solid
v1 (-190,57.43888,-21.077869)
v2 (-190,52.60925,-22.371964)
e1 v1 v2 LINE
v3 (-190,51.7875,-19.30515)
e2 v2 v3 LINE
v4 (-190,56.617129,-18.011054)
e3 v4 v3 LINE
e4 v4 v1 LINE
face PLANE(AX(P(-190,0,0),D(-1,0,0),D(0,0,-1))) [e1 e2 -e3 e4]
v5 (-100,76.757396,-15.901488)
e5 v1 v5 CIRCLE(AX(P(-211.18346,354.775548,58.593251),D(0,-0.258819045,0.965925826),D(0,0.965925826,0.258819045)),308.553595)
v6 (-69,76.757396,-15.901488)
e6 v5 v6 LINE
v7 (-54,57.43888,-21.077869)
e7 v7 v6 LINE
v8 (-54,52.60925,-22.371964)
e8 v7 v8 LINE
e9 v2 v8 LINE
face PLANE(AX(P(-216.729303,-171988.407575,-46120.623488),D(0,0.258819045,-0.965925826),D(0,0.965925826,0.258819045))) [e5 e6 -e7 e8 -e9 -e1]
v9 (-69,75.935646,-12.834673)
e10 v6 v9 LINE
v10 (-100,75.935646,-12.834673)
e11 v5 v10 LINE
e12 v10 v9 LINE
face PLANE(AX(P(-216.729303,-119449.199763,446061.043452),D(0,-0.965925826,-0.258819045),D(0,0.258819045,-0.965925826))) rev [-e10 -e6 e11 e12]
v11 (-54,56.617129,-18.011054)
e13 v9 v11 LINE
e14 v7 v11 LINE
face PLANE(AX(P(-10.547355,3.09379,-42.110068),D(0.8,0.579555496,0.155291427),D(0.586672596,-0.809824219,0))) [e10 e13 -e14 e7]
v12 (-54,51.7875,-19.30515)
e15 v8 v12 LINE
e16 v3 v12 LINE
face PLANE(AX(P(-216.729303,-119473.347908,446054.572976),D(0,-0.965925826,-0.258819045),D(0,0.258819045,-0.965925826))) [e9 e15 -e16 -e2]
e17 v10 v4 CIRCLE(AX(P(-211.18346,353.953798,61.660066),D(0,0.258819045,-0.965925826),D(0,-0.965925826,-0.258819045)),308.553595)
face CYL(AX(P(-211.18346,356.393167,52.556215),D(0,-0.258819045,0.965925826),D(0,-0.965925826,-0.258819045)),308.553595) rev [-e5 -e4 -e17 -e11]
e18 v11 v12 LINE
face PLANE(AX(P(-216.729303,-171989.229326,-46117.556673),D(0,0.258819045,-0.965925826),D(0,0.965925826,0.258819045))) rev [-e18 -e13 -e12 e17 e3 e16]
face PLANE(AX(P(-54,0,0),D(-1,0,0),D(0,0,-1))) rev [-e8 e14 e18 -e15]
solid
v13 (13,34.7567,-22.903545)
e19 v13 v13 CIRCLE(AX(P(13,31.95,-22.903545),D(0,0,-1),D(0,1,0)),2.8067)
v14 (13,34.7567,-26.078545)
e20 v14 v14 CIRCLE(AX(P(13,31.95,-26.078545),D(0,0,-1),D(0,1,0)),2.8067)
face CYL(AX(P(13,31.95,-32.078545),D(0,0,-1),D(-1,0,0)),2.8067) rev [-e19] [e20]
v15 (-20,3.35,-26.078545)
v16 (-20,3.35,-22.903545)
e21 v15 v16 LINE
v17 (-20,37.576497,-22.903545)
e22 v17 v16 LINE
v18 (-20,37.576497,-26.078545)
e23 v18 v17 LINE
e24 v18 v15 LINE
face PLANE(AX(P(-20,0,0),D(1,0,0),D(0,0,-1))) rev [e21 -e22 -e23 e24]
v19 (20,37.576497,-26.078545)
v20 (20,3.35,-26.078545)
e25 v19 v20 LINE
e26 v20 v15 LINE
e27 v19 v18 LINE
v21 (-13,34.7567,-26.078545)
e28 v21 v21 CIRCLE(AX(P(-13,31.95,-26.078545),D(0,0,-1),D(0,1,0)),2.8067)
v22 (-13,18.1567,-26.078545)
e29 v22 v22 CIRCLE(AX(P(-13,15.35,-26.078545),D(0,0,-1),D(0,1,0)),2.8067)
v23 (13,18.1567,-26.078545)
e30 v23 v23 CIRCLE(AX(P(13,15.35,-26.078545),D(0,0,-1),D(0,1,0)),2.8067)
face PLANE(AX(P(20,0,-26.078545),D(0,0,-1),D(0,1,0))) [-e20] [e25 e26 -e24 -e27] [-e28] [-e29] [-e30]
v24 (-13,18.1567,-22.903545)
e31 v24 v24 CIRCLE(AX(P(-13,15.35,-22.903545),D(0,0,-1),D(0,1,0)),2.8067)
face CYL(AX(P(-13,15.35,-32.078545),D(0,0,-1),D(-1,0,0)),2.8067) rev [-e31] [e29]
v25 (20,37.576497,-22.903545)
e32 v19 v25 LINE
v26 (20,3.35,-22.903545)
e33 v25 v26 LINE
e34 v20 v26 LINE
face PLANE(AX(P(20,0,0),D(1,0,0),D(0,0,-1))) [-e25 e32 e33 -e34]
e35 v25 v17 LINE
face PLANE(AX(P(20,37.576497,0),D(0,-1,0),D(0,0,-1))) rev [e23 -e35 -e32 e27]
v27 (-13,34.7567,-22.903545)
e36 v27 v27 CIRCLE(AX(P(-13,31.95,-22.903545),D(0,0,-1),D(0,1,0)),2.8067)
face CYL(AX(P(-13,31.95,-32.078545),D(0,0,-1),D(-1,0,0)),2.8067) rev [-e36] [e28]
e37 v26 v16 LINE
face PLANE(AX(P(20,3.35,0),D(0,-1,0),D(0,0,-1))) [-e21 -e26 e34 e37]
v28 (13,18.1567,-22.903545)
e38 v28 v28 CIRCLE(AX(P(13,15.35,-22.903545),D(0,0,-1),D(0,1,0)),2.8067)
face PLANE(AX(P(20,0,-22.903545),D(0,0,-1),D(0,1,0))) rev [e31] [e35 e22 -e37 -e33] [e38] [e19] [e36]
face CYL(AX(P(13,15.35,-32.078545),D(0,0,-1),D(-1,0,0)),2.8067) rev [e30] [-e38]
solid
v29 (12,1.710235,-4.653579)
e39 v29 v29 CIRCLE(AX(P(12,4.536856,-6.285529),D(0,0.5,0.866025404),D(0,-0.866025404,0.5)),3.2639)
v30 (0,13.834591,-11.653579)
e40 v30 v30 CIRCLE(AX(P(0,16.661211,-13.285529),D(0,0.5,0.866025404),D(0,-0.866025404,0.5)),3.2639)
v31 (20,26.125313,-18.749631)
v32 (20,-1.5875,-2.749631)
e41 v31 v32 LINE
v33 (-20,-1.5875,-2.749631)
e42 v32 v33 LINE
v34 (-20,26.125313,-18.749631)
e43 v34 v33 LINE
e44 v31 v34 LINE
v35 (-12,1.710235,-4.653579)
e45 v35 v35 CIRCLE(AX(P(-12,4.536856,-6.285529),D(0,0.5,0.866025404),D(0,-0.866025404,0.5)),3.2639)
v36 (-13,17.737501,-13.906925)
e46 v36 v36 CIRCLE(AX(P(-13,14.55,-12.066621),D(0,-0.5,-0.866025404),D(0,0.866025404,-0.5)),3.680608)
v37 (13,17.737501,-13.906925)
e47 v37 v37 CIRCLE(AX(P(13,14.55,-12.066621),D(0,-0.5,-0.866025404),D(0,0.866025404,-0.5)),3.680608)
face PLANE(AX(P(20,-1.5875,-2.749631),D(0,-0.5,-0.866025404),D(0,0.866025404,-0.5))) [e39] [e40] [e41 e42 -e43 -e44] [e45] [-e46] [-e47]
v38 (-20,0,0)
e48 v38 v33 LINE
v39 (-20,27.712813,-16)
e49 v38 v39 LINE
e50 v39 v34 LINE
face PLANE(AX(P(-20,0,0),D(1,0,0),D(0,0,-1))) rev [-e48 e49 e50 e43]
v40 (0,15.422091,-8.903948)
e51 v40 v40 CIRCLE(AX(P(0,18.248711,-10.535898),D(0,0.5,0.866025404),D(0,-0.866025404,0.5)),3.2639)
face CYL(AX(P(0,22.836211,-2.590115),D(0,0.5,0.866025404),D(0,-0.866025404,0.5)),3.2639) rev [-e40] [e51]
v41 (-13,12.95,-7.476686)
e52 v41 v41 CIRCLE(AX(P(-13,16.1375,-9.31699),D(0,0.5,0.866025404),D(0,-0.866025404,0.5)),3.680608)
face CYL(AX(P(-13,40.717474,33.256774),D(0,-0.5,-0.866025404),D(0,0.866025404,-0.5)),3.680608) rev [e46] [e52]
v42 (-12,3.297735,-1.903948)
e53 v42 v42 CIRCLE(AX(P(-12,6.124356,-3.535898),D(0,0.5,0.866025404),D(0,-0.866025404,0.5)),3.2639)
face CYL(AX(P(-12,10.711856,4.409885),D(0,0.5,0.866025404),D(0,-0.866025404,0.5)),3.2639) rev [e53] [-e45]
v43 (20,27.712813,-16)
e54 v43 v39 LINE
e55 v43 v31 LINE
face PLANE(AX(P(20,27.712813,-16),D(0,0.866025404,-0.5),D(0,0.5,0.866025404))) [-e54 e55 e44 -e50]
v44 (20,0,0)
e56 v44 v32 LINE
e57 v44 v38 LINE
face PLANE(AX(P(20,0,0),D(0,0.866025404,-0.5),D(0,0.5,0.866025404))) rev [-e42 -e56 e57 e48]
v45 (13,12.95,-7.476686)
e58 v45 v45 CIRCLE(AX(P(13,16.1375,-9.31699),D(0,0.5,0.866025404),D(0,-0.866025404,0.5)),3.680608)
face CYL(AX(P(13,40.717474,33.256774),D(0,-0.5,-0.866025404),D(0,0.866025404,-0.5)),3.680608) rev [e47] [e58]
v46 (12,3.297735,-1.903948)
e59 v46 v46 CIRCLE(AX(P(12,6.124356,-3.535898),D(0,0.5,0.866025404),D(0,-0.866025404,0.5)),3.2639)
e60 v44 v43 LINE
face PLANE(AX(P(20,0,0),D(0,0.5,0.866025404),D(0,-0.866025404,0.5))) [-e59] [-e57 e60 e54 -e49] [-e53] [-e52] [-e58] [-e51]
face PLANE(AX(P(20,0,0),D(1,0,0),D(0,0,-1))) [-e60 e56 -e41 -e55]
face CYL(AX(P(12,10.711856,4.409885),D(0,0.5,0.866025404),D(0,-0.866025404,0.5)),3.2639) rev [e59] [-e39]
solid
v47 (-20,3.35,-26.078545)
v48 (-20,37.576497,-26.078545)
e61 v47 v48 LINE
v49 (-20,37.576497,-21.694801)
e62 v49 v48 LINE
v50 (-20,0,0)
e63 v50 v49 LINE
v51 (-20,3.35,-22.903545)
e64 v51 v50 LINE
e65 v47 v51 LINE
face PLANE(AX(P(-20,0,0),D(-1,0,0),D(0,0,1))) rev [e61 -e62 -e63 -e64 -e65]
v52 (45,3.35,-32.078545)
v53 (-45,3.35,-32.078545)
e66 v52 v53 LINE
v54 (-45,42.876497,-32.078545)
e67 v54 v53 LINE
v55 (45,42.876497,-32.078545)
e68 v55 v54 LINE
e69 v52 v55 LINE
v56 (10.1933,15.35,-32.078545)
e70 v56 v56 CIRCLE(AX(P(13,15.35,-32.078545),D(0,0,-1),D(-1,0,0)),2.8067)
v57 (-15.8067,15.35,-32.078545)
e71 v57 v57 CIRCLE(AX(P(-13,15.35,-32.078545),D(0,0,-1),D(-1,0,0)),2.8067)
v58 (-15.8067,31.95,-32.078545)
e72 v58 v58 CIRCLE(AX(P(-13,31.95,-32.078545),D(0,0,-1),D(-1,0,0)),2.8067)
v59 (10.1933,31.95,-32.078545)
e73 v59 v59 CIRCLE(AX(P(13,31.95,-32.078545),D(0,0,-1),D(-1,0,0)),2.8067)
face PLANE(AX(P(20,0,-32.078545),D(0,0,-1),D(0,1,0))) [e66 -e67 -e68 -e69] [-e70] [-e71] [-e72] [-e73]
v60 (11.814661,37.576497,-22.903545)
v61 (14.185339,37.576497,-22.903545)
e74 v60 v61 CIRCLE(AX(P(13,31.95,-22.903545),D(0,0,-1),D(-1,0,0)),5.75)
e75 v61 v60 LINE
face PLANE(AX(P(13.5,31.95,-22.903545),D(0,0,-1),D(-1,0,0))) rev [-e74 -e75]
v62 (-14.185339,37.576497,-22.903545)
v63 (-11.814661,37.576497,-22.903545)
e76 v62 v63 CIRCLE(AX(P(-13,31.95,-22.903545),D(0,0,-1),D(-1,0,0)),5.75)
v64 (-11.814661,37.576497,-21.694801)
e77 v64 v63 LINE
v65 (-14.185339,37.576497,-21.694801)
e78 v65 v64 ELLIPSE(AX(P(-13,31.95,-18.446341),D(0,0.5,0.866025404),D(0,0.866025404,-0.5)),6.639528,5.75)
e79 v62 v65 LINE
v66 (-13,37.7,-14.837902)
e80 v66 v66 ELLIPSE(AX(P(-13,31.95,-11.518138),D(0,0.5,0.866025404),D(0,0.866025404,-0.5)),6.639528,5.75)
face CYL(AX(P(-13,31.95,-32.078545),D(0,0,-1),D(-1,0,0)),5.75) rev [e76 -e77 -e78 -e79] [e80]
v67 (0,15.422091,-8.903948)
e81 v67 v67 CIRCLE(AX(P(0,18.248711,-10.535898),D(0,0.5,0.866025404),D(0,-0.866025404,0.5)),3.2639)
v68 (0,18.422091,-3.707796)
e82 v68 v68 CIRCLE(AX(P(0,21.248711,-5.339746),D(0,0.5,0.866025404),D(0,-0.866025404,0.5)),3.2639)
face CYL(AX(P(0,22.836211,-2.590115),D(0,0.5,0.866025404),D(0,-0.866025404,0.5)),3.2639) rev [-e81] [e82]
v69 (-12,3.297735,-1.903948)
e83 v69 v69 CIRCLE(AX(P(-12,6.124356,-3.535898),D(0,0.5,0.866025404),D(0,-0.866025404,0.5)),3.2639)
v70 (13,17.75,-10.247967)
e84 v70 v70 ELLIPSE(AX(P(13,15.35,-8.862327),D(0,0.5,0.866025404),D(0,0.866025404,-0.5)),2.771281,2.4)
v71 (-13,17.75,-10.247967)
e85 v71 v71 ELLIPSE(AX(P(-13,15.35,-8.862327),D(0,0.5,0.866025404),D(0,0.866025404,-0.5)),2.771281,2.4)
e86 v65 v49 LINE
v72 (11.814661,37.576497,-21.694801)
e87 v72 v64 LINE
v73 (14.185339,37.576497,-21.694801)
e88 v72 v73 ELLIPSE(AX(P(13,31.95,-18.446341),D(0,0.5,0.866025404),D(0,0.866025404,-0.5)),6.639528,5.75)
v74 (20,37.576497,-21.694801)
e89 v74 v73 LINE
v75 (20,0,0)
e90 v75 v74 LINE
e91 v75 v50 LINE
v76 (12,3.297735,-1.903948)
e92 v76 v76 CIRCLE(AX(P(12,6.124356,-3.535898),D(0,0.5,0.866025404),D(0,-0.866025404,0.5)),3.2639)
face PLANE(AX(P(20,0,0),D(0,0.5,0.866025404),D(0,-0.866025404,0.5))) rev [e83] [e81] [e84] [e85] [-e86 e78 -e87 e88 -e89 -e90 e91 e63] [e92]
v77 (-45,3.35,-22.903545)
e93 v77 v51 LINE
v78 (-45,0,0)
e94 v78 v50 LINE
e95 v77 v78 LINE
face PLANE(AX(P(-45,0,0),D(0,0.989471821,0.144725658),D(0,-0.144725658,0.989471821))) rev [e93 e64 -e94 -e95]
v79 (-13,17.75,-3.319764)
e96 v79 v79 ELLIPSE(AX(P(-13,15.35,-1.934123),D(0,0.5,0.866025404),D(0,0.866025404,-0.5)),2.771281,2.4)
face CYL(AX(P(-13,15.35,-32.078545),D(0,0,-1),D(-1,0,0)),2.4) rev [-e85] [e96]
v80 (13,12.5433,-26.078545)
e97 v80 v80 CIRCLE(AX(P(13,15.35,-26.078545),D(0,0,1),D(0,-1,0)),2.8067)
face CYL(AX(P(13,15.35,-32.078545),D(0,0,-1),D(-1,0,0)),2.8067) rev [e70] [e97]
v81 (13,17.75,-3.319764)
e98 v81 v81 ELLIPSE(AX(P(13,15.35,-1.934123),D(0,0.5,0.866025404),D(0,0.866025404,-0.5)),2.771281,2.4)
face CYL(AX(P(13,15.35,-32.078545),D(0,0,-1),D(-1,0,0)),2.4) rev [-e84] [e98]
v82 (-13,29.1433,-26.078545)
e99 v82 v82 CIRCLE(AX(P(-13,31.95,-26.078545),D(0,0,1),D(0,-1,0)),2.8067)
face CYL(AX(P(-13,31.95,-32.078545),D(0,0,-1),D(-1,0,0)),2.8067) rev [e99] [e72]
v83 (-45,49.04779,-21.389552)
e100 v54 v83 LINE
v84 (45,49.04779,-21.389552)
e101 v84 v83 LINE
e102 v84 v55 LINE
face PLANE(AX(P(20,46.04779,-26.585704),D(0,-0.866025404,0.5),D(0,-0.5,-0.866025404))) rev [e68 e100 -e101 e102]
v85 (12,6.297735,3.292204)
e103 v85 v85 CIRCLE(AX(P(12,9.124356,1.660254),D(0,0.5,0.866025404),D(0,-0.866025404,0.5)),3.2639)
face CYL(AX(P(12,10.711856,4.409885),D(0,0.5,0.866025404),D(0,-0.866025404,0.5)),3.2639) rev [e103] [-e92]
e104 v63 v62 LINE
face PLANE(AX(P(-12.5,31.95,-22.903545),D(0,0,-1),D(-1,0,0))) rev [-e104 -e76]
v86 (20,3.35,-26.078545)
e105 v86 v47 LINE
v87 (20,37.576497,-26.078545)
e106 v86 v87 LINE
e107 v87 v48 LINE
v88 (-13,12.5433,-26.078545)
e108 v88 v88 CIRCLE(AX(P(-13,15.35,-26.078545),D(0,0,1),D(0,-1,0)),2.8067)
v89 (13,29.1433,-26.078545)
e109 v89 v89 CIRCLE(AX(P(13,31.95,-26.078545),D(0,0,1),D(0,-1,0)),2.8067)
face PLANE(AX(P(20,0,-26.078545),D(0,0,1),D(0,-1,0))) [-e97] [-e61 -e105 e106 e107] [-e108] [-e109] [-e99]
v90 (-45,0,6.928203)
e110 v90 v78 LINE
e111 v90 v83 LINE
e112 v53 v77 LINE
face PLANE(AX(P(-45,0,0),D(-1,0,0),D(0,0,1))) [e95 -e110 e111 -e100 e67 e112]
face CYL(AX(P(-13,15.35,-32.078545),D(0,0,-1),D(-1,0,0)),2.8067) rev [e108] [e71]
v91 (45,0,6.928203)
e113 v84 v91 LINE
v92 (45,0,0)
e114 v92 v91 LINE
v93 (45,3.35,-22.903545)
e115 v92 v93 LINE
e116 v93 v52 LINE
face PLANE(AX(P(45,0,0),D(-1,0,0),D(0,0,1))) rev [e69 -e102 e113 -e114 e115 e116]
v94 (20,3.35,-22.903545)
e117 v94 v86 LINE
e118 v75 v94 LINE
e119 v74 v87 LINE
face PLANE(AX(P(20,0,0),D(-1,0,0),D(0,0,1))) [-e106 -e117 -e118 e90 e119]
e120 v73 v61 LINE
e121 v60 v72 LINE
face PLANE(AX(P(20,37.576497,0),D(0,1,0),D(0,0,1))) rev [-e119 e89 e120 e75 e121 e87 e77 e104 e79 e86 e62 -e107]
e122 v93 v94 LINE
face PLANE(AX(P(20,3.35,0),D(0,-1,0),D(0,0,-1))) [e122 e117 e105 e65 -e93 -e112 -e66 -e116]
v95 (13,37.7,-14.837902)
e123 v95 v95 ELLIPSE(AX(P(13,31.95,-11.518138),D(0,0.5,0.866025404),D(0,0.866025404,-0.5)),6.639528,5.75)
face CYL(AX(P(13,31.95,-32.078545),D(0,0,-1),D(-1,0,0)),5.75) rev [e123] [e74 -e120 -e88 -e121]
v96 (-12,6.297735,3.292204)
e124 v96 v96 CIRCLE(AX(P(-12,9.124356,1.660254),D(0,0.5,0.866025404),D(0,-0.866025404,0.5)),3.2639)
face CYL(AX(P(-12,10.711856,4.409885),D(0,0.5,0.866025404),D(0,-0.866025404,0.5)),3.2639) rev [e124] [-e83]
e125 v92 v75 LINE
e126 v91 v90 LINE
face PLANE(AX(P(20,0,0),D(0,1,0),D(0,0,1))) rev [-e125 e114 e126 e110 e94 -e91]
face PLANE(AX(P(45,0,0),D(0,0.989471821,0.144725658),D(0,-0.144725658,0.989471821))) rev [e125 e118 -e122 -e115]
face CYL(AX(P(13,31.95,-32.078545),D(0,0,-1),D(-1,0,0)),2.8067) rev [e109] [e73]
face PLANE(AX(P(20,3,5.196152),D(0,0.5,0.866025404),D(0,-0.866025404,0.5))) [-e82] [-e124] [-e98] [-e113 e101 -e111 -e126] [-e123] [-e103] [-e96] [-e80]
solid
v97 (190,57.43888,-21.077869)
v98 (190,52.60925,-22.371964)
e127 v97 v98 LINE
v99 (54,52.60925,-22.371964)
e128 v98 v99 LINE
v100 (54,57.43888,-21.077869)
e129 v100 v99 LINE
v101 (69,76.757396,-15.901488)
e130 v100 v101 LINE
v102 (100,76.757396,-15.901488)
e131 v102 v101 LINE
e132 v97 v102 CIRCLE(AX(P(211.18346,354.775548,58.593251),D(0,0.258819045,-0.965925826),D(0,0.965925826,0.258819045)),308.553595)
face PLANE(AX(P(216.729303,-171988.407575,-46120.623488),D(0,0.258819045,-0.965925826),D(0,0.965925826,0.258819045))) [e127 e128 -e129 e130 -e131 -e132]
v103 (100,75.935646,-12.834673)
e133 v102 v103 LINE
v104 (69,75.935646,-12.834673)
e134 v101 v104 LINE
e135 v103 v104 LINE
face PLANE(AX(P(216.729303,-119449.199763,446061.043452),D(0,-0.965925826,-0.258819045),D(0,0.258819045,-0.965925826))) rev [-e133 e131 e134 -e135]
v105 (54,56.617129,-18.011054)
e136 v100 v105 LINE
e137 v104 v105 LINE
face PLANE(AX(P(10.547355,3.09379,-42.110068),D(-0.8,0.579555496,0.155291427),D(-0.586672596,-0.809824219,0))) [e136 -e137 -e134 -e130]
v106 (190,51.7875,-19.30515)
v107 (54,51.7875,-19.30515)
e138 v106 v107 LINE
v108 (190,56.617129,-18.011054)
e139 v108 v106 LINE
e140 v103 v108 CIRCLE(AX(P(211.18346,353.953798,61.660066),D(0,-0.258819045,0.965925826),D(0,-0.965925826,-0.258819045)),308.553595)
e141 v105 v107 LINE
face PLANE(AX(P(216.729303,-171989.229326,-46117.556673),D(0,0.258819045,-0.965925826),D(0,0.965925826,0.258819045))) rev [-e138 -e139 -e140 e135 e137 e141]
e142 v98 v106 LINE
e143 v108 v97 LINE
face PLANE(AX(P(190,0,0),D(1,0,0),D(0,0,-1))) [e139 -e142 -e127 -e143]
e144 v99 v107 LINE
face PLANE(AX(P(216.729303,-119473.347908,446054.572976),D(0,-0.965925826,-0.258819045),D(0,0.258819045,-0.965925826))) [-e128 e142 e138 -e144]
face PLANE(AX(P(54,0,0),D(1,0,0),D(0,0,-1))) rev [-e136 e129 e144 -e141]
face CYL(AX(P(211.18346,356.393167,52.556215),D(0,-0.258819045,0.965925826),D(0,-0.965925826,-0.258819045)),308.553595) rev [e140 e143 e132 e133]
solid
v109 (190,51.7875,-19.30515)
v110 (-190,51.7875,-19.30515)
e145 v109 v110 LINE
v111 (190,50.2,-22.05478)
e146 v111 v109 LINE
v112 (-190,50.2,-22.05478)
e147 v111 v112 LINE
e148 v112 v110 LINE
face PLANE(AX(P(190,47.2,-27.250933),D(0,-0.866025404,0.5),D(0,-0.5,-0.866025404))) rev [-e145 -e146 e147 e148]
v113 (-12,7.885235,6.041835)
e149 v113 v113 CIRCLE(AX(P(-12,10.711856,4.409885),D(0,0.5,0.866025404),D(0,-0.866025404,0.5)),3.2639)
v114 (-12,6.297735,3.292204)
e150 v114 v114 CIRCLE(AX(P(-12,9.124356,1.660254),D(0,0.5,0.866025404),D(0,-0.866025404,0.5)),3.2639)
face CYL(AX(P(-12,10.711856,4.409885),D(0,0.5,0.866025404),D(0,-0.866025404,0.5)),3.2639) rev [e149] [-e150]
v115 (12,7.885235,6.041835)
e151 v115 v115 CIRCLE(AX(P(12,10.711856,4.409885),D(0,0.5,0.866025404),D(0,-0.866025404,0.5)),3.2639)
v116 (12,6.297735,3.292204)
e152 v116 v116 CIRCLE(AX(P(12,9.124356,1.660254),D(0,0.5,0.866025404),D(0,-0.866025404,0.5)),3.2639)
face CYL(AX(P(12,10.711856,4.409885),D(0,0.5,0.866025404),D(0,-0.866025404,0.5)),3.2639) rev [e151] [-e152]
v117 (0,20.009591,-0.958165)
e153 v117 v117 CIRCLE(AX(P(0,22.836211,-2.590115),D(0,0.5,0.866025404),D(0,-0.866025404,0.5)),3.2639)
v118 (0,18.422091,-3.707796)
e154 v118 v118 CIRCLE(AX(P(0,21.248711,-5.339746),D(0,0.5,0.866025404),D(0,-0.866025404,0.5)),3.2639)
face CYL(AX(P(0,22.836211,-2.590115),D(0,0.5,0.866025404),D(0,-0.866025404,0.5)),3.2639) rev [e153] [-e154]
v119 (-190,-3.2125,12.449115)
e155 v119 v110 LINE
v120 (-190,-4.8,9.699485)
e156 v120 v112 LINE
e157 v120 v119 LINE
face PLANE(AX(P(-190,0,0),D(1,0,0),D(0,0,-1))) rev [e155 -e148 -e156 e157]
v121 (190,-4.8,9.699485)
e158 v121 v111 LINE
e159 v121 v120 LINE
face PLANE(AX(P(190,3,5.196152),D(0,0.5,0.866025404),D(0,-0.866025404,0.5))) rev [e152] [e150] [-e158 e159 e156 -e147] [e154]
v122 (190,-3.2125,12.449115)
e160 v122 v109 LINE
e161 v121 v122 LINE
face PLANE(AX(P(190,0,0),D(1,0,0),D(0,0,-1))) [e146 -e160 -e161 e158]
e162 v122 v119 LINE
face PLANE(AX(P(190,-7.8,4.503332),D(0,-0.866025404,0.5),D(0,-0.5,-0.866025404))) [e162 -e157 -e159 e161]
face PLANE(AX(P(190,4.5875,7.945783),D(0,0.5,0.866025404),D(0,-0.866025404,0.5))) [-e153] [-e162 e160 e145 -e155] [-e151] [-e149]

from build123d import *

# Parameters (mm, degrees)
BOSS_EXTRUDE1_DEPTH                 = 190
BOSS_EXTRUDE2_START                 = 54
BOSS_EXTRUDE2_DEPTH                 = 136
CUT_EXTRUDE1_DEPTH                  = 207.570315507
BOSS_EXTRUDE4_DEPTH                 = 20
BOSS_EXTRUDE5_DEPTH                 = 20
BOSS_EXTRUDE6_DEPTH                 = 20
F_12_CLEARANCE_HOLE1_AT_2_COUNT     = 2
F_12_CLEARANCE_HOLE1_AT_2_PITCH     = 16.6
F_12_CLEARANCE_HOLE1_AT_3_COUNT     = 2
F_12_CLEARANCE_HOLE1_AT_3_PITCH     = 30.847366176
F_12_CLEARANCE_HOLE1_AT_4_COUNT     = 2
F_12_CLEARANCE_HOLE1_AT_4_PITCH     = 26
SKETCH15_W                          = 2.4
SKETCH15_H                          = 44.527659988
F_4_8_4_8_DIAMETER_HOLE1_AT_2_COUNT = 2
F_4_8_4_8_DIAMETER_HOLE1_AT_2_PITCH = 26
ADVANCEDHOLE6_START                 = -22.903544809
ADVANCEDHOLE6_OUTLINE_R             = 5.75
ADVANCEDHOLE6_DEPTH                 = 14.705171087
SKETCH16_R                          = 3.68060844
CUT_EXTRUDE2_DEPTH                  = 208.600838038
ADVANCEDHOLE2_START                 = -3.175
ADVANCEDHOLE2_OUTLINE_R             = 3.2639
ADVANCEDHOLE2_DEPTH                 = 12.35
BOSS_EXTRUDE7_START                 = 20
BOSS_EXTRUDE7_DEPTH                 = 25
BOSS_EXTRUDE8_START                 = -20
BOSS_EXTRUDE8_DEPTH                 = 25


# Read off the part's stored shape, not the designer's step: AdvancedHole6, AdvancedHole2
with BuildPart() as part:
    # Sketch1 → Boss-Extrude1 (new, symmetric)
    with BuildSketch(Plane(origin=(0, 0, 0), x_dir=(0, 0, -1), z_dir=(1, 0, 0))):
        Polygon((-9.699484522, -4.8), (22.054780283, 50.2), (19.305149626, 51.7875), (-12.449115179, -3.2125), align=None)
    extrude(amount=BOSS_EXTRUDE1_DEPTH, both=True)


with BuildPart() as body_2:
    # Sketch1<4> → Boss-Extrude2 (new body)
    with BuildSketch(Plane(origin=(0, 0, 0), x_dir=(0, 0, -1), z_dir=(1, 0, 0)).offset(BOSS_EXTRUDE2_START)):
        Polygon((19.305149626, 51.7875), (22.371964124, 52.609250468), (15.901487997, 76.757396125), (12.834673498, 75.935645657), align=None)
    extrude(amount=BOSS_EXTRUDE2_DEPTH)

    # Sketch2 → Cut-Extrude1 (cut, through all)
    with BuildSketch(Plane(origin=(0, 8.295392107, -30.958824813), x_dir=(1, 0, 0), z_dir=(0, -0.25881904510252507, 0.9659258262890673))):
        Polygon((54, 50.026343337), (69, 70.026343337), (54, 70.026343337), align=None)
        with BuildLine():
            ThreePointArc((100, 70.026343337), (144.24878754, 56.645887268), (190, 50.026343337))
            Line((190, 50.026343337), (190, 70.026343337))
            Line((190, 70.026343337), (100, 70.026343337))
        make_face()
    extrude(amount=-CUT_EXTRUDE1_DEPTH, mode=Mode.SUBTRACT)


with BuildPart() as body_3:
    # Mirror1: mirrored copy
    add(body_2.part.mirror(Plane(origin=(0, 0, 0), x_dir=(0, 0, 1), z_dir=(1, 0, 0))))


with BuildPart() as body_4:
    # Sketch1<5> → Boss-Extrude4 (new, symmetric)
    with BuildSketch(Plane(origin=(0, 0, 0), x_dir=(0, 0, -1), z_dir=(1, 0, 0))):
        Polygon((21.389551727, 49.047790342), (-6.92820323, 0), (0, 0), (16, 27.712812921), (21.694800836, 37.576497308), (22.903544809, 37.576497308), (26.078544809, 37.576497308), (26.078544809, 12.35), (26.078544809, 3.35), (32.078544809, 3.35), (32.078544809, 42.876497308), align=None)
    extrude(amount=BOSS_EXTRUDE4_DEPTH, both=True)


with BuildPart() as body_5:
    # Sketch1<6> → Boss-Extrude5 (new, symmetric)
    with BuildSketch(Plane(origin=(0, 0, 0), x_dir=(0, 0, -1), z_dir=(1, 0, 0))):
        Polygon((2.749630657, -1.5875), (18.749630657, 26.125312921), (16, 27.712812921), (0, 0), align=None)
    extrude(amount=BOSS_EXTRUDE5_DEPTH, both=True)

    # Sketch16 → Cut-Extrude2 (cut, through all)
    with BuildSketch(Plane(origin=(0, -1.5875, -2.749630657), x_dir=(-1, 0, 0), z_dir=(0, -0.49999999999999756, -0.86602540378444))):
        with Locations(Location((13, 18.633980412, 0), (0, 0, 90))):
            Circle(SKETCH16_R)
        with Locations(Location((-13, 18.633980412, 0), (0, 0, 90))):
            Circle(SKETCH16_R)
    extrude(amount=-CUT_EXTRUDE2_DEPTH, mode=Mode.SUBTRACT)


with BuildPart() as body_6:
    # Sketch1<7> → Boss-Extrude6 (new, symmetric)
    with BuildSketch(Plane(origin=(0, 0, 0), x_dir=(0, 0, -1), z_dir=(1, 0, 0))):
        Polygon((22.903544809, 37.576497308), (22.903544809, 3.35), (26.078544809, 3.35), (26.078544809, 12.35), (26.078544809, 37.576497308), align=None)
    extrude(amount=BOSS_EXTRUDE6_DEPTH, both=True)


with BuildPart() as f_12_clearance_hole1_tool:
    # Sketch8 → #12 Clearance Hole1 (revolve)
    with BuildSketch(Plane(origin=(13, 15.35, -32.078544809), x_dir=(0, 1, 0), z_dir=(1, 0, 0))):
        Polygon((0, 0), (0, 11.686435499), (2.8067, 10), (2.8067, 0), align=None)
    f_12_clearance_hole1 = revolve(axis=Axis((13, 15.35, -38.428544809), (0, 0, 1)))


with BuildPart() as body_4_1:
    add(body_4.part)

    # #12 Clearance Hole1: cut by f_12_clearance_hole1_tool
    add(f_12_clearance_hole1_tool.part, mode=Mode.SUBTRACT)


with BuildPart() as body_6_1:
    add(body_6.part)

    # #12 Clearance Hole1: cut by f_12_clearance_hole1_tool
    add(f_12_clearance_hole1_tool.part, mode=Mode.SUBTRACT)


with BuildPart() as f_12_clearance_hole1_at_2_tool:
    # #12 Clearance Hole1 at 2: #12 Clearance Hole1 ×2
    with Locations(*[(0, i * F_12_CLEARANCE_HOLE1_AT_2_PITCH, 0) for i in range(1, F_12_CLEARANCE_HOLE1_AT_2_COUNT)]):
        add(f_12_clearance_hole1)


with BuildPart() as body_4_2:
    add(body_4_1.part)

    # #12 Clearance Hole1 at 2: cut by f_12_clearance_hole1_at_2_tool
    add(f_12_clearance_hole1_at_2_tool.part, mode=Mode.SUBTRACT)


with BuildPart() as body_6_2:
    add(body_6_1.part)

    # #12 Clearance Hole1 at 2: cut by f_12_clearance_hole1_at_2_tool
    add(f_12_clearance_hole1_at_2_tool.part, mode=Mode.SUBTRACT)


with BuildPart() as f_12_clearance_hole1_at_3_tool:
    # #12 Clearance Hole1 at 3: #12 Clearance Hole1 ×2
    with Locations(*[Vector(-0.842859641617543, 0.5381334634942776, 0) * (i * F_12_CLEARANCE_HOLE1_AT_3_PITCH) for i in range(1, F_12_CLEARANCE_HOLE1_AT_3_COUNT)]):
        add(f_12_clearance_hole1)


with BuildPart() as body_4_3:
    add(body_4_2.part)

    # #12 Clearance Hole1 at 3: cut by f_12_clearance_hole1_at_3_tool
    add(f_12_clearance_hole1_at_3_tool.part, mode=Mode.SUBTRACT)


with BuildPart() as body_6_3:
    add(body_6_2.part)

    # #12 Clearance Hole1 at 3: cut by f_12_clearance_hole1_at_3_tool
    add(f_12_clearance_hole1_at_3_tool.part, mode=Mode.SUBTRACT)


with BuildPart() as f_12_clearance_hole1_at_4_tool:
    # #12 Clearance Hole1 at 4: #12 Clearance Hole1 ×2
    with Locations(*[(-i * F_12_CLEARANCE_HOLE1_AT_4_PITCH, 0, 0) for i in range(1, F_12_CLEARANCE_HOLE1_AT_4_COUNT)]):
        add(f_12_clearance_hole1)


with BuildPart() as body_4_4:
    add(body_4_3.part)

    # #12 Clearance Hole1 at 4: cut by f_12_clearance_hole1_at_4_tool
    add(f_12_clearance_hole1_at_4_tool.part, mode=Mode.SUBTRACT)

    # Sketch15 → Ø4.8 (4.8) Diameter Hole1 (revolve, cut)
    with BuildSketch(Plane(origin=(-13, 15.35, -32.078544809), x_dir=(0, 1, 0), z_dir=(1, 0, 0))):
        with Locations((1.2, 22.263829994)):
            Rectangle(SKETCH15_W, SKETCH15_H)
    f_4_8_4_8_diameter_hole1 = revolve(axis=Axis((-13, 15.35, -38.428544809), (0, 0, 1)), mode=Mode.SUBTRACT)

    # Ø4.8 (4.8) Diameter Hole1 at 2: Ø4.8 (4.8) Diameter Hole1 ×2
    with Locations(*[(i * F_4_8_4_8_DIAMETER_HOLE1_AT_2_PITCH, 0, 0) for i in range(1, F_4_8_4_8_DIAMETER_HOLE1_AT_2_COUNT)]):
        add(f_4_8_4_8_diameter_hole1, mode=Mode.SUBTRACT)

    # AdvancedHole6 outline → AdvancedHole6 (cut)
    with BuildSketch(Plane.XY.offset(ADVANCEDHOLE6_START)):
        with Locations((-13, 31.95)):
            Circle(ADVANCEDHOLE6_OUTLINE_R)
        with Locations((13, 31.95)):
            Circle(ADVANCEDHOLE6_OUTLINE_R)
    extrude(amount=ADVANCEDHOLE6_DEPTH, mode=Mode.SUBTRACT)


with BuildPart() as body_6_4:
    add(body_6_3.part)

    # #12 Clearance Hole1 at 4: cut by f_12_clearance_hole1_at_4_tool
    add(f_12_clearance_hole1_at_4_tool.part, mode=Mode.SUBTRACT)


with BuildPart() as advancedhole2_tool:
    # AdvancedHole2 outline → AdvancedHole2 (new body)
    with BuildSketch(Plane(origin=(0, 0, 0), x_dir=(1, 0, 0), z_dir=(0, 0.49999999999999795, 0.8660254037844399)).offset(ADVANCEDHOLE2_START)):
        with Locations((0, 21.07179677)):
            Circle(ADVANCEDHOLE2_OUTLINE_R)
        with Locations((-12, 7.07179677)):
            Circle(ADVANCEDHOLE2_OUTLINE_R)
        with Locations((12, 7.07179677)):
            Circle(ADVANCEDHOLE2_OUTLINE_R)
    extrude(amount=ADVANCEDHOLE2_DEPTH)


with BuildPart() as part_1:
    add(part.part)

    # AdvancedHole2: cut by advancedhole2_tool
    add(advancedhole2_tool.part, mode=Mode.SUBTRACT)


with BuildPart() as body_4_5:
    add(body_4_4.part)

    # AdvancedHole2: cut by advancedhole2_tool
    add(advancedhole2_tool.part, mode=Mode.SUBTRACT)

    # Sketch1<8> → Boss-Extrude7 (add)
    with BuildSketch(Plane(origin=(0, 0, 0), x_dir=(0, 0, -1), z_dir=(1, 0, 0)).offset(BOSS_EXTRUDE7_START)):
        Polygon((21.389551727, 49.047790342), (-6.92820323, 0), (0, 0), (22.903544809, 3.35), (32.078544809, 3.35), (32.078544809, 42.876497308), align=None)
    extrude(amount=BOSS_EXTRUDE7_DEPTH)

    # Sketch1<9> → Boss-Extrude8 (add)
    with BuildSketch(Plane(origin=(0, 0, 0), x_dir=(0, 0, -1), z_dir=(1, 0, 0)).offset(BOSS_EXTRUDE8_START)):
        Polygon((21.389551727, 49.047790342), (-6.92820323, 0), (0, 0), (22.903544809, 3.35), (32.078544809, 3.35), (32.078544809, 42.876497308), align=None)
    extrude(amount=-BOSS_EXTRUDE8_DEPTH)


with BuildPart() as body_5_1:
    add(body_5.part)

    # AdvancedHole2: cut by advancedhole2_tool
    add(advancedhole2_tool.part, mode=Mode.SUBTRACT)


solid = Compound([body_2.part, body_3.part, body_6_4.part, part_1.part, body_4_5.part, body_5_1.part])
